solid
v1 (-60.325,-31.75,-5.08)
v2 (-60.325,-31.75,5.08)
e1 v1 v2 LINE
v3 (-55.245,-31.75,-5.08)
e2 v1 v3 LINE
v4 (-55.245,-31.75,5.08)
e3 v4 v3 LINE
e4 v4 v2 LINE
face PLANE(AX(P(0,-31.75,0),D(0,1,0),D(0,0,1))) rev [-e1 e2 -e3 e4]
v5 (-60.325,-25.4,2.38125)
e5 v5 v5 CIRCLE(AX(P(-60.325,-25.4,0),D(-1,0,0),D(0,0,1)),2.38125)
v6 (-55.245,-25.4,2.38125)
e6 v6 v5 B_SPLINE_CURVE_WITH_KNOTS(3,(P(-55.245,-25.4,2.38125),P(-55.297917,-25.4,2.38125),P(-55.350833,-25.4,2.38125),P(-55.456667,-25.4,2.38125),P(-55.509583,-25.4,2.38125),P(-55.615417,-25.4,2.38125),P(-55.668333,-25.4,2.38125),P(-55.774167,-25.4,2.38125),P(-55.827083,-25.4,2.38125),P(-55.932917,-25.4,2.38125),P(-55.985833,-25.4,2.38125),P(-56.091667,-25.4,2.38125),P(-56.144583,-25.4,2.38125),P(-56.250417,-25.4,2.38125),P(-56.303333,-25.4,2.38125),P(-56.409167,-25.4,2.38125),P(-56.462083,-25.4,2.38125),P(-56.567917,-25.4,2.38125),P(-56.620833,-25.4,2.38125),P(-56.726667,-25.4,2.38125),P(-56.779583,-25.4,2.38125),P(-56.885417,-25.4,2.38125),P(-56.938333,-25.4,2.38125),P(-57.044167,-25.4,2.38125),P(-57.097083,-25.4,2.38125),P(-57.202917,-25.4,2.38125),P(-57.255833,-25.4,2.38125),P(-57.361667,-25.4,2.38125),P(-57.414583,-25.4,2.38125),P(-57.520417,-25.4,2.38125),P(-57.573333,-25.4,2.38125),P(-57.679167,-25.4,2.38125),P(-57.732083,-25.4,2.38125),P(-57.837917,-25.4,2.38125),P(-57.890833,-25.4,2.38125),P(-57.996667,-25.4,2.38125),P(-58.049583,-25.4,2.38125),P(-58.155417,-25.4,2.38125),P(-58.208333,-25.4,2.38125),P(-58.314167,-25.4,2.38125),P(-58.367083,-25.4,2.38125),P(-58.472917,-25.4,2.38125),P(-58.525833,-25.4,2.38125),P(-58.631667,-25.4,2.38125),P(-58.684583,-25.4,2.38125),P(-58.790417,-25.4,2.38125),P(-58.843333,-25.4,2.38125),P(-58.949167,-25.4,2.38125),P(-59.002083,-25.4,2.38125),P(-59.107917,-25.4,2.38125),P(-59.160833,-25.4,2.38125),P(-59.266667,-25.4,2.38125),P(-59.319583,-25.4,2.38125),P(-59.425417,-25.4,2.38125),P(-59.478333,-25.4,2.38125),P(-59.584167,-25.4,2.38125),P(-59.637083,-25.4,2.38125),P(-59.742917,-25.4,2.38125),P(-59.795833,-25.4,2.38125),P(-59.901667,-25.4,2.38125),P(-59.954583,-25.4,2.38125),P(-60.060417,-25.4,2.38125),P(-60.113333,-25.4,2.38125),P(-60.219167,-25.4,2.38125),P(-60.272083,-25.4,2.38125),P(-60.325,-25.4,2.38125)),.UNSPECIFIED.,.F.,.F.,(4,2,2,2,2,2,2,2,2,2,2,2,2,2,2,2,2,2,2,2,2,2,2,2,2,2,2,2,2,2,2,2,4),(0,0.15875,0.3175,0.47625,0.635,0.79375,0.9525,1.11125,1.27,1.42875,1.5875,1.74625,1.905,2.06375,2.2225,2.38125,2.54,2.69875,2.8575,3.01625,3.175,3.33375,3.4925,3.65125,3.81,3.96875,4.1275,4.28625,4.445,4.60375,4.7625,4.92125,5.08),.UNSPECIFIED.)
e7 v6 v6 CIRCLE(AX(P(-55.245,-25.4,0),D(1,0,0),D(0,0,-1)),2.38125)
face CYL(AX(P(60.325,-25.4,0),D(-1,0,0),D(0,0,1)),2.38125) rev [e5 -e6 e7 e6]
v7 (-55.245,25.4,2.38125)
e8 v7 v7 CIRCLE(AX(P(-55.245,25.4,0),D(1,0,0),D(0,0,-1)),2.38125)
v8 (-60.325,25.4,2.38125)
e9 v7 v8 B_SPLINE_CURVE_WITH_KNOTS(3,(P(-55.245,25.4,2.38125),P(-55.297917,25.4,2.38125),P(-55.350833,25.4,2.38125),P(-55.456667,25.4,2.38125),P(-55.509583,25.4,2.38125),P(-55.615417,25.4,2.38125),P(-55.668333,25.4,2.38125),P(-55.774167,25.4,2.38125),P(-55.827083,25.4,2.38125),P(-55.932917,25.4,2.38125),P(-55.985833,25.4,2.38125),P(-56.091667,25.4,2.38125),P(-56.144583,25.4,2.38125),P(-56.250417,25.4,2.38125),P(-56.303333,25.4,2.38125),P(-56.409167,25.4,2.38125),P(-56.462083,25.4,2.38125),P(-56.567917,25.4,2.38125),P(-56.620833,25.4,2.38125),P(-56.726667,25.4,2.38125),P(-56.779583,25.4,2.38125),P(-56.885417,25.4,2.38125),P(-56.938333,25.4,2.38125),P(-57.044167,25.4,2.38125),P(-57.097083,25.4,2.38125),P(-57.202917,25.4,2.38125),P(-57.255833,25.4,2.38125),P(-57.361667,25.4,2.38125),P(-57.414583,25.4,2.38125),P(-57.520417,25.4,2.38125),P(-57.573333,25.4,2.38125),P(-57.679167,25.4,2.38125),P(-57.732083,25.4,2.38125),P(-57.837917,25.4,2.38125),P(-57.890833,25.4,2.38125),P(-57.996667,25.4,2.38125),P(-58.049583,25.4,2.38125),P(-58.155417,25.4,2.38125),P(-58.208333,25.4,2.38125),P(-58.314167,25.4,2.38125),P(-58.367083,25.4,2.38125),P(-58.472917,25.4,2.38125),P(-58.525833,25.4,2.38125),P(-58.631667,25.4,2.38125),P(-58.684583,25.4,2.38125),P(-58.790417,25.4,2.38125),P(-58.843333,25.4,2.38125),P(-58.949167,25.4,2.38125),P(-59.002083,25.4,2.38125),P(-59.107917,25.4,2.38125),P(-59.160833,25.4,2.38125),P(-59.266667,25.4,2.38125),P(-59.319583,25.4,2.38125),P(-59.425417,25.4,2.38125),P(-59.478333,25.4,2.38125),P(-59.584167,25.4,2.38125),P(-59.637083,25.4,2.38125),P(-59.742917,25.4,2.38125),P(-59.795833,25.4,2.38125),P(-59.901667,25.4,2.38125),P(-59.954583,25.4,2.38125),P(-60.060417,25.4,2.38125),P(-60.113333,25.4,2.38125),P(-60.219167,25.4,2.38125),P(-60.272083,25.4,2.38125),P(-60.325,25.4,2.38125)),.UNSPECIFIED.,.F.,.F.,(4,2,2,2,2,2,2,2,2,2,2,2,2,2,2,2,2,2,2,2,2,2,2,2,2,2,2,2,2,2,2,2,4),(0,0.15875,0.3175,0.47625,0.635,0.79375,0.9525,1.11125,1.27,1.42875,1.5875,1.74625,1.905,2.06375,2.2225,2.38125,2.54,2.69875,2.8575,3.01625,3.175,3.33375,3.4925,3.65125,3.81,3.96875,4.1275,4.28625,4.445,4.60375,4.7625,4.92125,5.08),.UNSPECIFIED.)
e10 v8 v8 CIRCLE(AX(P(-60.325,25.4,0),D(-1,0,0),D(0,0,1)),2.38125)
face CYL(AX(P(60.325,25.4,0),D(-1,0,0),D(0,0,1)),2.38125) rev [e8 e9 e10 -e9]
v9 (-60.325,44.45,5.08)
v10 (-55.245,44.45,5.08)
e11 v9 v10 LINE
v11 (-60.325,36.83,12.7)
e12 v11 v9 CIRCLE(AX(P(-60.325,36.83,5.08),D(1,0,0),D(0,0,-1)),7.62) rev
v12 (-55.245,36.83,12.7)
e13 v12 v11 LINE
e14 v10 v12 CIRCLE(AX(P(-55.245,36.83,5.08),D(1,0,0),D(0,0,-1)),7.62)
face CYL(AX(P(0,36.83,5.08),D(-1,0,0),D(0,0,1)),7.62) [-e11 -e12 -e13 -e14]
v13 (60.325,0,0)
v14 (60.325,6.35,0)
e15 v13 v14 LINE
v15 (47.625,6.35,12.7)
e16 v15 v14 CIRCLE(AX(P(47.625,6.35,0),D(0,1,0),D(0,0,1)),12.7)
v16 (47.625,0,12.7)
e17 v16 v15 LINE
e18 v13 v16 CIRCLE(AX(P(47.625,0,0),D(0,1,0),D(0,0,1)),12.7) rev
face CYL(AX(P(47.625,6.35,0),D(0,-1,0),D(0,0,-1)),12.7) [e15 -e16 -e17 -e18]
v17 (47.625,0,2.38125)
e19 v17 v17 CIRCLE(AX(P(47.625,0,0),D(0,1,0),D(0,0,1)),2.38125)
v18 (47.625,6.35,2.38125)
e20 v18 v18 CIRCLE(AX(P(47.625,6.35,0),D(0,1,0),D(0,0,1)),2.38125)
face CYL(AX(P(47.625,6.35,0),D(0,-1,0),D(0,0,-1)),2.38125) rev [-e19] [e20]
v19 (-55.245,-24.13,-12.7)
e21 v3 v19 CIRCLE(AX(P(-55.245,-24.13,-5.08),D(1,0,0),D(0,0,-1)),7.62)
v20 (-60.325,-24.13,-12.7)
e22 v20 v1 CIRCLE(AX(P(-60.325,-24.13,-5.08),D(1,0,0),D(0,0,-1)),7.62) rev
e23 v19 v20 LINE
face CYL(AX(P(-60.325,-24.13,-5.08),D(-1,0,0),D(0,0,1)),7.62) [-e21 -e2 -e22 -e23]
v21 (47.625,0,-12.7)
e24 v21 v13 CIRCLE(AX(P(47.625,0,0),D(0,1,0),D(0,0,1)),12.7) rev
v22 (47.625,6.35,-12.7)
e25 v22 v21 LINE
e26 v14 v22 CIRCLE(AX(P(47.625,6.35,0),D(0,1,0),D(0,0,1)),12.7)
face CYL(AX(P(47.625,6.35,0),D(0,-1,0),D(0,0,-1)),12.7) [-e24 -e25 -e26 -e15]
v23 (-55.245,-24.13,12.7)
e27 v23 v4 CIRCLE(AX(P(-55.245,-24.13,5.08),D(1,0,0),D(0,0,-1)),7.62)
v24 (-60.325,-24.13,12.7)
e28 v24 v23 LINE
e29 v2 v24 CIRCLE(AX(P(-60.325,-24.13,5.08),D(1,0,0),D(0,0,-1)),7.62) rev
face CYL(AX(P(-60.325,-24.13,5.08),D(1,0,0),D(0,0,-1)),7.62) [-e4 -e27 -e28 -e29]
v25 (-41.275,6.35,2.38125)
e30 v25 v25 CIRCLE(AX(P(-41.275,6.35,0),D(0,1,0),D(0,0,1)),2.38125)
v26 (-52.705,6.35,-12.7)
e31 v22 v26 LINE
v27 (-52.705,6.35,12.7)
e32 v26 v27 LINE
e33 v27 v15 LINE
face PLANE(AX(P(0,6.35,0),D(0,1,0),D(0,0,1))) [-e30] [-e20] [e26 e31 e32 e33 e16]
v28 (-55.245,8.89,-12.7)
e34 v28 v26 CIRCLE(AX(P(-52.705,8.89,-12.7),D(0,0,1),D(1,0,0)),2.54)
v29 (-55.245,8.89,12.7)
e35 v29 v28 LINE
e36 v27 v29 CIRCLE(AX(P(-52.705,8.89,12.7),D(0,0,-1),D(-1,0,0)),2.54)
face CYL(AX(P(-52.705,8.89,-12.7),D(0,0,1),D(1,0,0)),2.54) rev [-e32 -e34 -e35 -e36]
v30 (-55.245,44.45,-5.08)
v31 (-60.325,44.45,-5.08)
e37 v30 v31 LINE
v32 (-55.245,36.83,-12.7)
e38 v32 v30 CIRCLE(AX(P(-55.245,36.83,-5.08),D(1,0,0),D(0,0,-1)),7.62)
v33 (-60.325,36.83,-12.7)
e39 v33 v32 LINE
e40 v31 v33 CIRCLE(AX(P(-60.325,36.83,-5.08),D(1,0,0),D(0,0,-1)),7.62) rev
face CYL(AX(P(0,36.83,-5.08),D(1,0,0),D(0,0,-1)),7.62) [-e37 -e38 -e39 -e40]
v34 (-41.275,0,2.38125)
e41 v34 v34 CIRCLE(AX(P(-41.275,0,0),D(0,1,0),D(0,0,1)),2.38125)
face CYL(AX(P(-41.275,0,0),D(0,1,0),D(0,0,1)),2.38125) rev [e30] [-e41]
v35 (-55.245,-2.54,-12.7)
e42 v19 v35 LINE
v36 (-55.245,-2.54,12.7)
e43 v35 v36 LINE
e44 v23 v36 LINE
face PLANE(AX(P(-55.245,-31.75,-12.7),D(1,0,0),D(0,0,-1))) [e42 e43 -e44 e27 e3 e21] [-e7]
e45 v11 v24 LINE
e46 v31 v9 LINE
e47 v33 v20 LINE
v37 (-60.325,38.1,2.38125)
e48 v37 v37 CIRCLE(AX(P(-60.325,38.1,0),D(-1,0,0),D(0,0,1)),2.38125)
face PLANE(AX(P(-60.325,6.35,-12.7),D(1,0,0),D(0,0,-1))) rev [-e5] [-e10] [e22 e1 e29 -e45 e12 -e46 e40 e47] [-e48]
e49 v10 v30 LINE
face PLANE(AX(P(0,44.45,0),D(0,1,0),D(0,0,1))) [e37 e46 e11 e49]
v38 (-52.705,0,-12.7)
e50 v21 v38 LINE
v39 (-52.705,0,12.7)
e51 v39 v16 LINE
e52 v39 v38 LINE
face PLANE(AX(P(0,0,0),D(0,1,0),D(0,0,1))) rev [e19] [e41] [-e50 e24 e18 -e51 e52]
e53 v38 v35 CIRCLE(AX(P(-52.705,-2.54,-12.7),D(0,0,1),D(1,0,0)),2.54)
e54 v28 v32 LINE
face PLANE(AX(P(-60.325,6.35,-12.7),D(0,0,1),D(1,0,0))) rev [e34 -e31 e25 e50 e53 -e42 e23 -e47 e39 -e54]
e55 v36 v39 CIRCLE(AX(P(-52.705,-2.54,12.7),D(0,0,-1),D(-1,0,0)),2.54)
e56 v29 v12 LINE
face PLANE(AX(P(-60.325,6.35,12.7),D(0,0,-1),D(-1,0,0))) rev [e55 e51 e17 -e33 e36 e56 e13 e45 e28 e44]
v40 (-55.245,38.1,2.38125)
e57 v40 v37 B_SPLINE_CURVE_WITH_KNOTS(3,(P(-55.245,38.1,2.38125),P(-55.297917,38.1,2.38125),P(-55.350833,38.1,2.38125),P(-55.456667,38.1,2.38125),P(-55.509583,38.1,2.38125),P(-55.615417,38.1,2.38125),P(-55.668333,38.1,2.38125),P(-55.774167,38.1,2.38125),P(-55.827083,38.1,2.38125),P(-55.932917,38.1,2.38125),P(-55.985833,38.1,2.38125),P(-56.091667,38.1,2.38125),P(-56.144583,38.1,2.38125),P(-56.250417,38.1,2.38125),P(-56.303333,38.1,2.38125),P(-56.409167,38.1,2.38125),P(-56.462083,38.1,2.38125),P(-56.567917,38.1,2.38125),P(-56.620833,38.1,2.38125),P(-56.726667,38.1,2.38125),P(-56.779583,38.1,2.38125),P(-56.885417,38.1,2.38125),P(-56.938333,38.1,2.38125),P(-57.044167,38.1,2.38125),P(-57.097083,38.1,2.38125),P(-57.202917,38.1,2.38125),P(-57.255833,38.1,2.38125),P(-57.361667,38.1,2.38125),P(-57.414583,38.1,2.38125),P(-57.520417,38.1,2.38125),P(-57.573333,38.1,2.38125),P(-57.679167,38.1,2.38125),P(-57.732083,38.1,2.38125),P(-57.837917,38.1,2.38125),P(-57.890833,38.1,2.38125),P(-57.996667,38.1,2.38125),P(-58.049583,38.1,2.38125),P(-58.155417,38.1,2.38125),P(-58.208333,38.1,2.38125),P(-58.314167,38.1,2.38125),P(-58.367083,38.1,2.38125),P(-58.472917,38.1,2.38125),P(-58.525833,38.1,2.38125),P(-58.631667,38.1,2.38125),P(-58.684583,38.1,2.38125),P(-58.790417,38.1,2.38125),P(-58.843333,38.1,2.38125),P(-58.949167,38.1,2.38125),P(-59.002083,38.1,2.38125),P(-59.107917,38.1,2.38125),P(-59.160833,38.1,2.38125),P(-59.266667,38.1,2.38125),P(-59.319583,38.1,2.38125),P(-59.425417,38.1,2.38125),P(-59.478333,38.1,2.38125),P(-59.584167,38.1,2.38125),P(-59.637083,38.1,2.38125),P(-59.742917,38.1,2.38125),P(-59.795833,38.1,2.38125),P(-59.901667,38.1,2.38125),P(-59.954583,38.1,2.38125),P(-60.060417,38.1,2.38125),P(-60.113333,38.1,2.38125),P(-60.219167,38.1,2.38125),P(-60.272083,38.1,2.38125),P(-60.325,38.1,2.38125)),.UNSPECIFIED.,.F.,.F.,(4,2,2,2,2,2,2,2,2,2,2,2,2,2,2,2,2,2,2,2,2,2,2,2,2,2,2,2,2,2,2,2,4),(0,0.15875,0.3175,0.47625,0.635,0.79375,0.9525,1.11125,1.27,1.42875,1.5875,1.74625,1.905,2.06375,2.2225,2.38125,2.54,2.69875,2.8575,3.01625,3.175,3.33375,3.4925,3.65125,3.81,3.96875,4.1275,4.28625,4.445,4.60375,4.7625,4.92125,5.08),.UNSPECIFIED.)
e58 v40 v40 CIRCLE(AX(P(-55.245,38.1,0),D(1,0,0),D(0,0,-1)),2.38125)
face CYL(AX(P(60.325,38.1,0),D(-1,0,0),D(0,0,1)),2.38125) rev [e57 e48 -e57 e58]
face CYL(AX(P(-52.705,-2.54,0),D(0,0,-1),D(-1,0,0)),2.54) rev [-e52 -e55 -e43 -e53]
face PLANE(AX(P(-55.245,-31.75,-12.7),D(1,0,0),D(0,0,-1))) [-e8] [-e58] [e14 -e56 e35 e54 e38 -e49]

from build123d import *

# Parameters (mm, degrees)
SKETCH1_W                = 120.65
SKETCH1_H                = 25.4
SKETCH1_R                = 2.38125
BOSS_EXTRUDE1_DEPTH      = 6.35
SKETCH2_R                = 2.38125
CUT_EXTRUDE1_DEPTH       = 6.35
BOSS_EXTRUDE2_DEPTH      = 38.1
BOSS_EXTRUDE2_DEPTH_BACK = 38.1
SKETCH3_W                = 5.08
SKETCH3_H                = 25.4
SKETCH4_R                = 2.38125
CUT_EXTRUDE2_DEPTH       = 130.203386179
FILLET1_R                = 2.54
FILLET2_R                = 7.62
FILLET3_R                = 12.7


with BuildPart() as part:
    # Sketch1 → Boss-Extrude1 (new body)
    with BuildSketch(Plane(origin=(0, 0, 0), x_dir=(1, 0, 0), z_dir=(0, 1, 0))):
        Rectangle(SKETCH1_W, SKETCH1_H)
        with Locations(Location((47.625, 0, 0), (0, 0, 270))):
            Circle(SKETCH1_R, mode=Mode.SUBTRACT)
    extrude(amount=BOSS_EXTRUDE1_DEPTH)

    # Sketch2 → Cut-Extrude1 (cut)
    with BuildSketch(Plane(origin=(0, 6.35, 0), x_dir=(1, 0, 0), z_dir=(0, 1, 0))):
        with Locations(Location((-41.275, 0, 0), (0, 0, 270))):
            Circle(SKETCH2_R)
    extrude(amount=-CUT_EXTRUDE1_DEPTH, mode=Mode.SUBTRACT)

    # Sketch3 → Boss-Extrude2 (add, two sides: drawn at the far end of the back side and taken through both)
    with BuildSketch(Plane(origin=(0, 6.35, 0), x_dir=(1, 0, 0), z_dir=(0, 1, 0)).offset(-BOSS_EXTRUDE2_DEPTH_BACK)):
        with Locations((-57.785, 0)):
            Rectangle(SKETCH3_W, SKETCH3_H)
    extrude(amount=BOSS_EXTRUDE2_DEPTH + BOSS_EXTRUDE2_DEPTH_BACK)

    # Sketch4 → Cut-Extrude2 (cut, through all)
    with BuildSketch(Plane.ZY.offset(60.325)):
        with Locations((0, 25.4)):
            Circle(SKETCH4_R)
        with Locations((0, -25.4)):
            Circle(SKETCH4_R)
        with Locations((0, 38.1)):
            Circle(SKETCH4_R)
    extrude(amount=-CUT_EXTRUDE2_DEPTH, mode=Mode.SUBTRACT)

    # Fillet1
    fillet1_edges = [part.edges().sort_by_distance(p)[0] for p in [
        (-55.245, 0, 0),
        (-55.245, 6.35, 0),
    ]]
    fillet(fillet1_edges, radius=FILLET1_R)

    # Fillet2
    fillet2_edges = [part.edges().sort_by_distance(p)[0] for p in [
        (-57.785, -31.75, -12.7),
        (-57.785, -31.75, 12.7),
        (-57.785, 44.45, 12.7),
        (-57.785, 44.45, -12.7),
    ]]
    fillet(fillet2_edges, radius=FILLET2_R)

    # Fillet3
    fillet3_edges = [part.edges().sort_by_distance(p)[0] for p in [
        (60.325, 3.175, 12.7),
        (60.325, 3.175, -12.7),
    ]]
    fillet(fillet3_edges, radius=FILLET3_R - 0.0001)  # a hair under: the kernel refuses the full size


solid = part.part
